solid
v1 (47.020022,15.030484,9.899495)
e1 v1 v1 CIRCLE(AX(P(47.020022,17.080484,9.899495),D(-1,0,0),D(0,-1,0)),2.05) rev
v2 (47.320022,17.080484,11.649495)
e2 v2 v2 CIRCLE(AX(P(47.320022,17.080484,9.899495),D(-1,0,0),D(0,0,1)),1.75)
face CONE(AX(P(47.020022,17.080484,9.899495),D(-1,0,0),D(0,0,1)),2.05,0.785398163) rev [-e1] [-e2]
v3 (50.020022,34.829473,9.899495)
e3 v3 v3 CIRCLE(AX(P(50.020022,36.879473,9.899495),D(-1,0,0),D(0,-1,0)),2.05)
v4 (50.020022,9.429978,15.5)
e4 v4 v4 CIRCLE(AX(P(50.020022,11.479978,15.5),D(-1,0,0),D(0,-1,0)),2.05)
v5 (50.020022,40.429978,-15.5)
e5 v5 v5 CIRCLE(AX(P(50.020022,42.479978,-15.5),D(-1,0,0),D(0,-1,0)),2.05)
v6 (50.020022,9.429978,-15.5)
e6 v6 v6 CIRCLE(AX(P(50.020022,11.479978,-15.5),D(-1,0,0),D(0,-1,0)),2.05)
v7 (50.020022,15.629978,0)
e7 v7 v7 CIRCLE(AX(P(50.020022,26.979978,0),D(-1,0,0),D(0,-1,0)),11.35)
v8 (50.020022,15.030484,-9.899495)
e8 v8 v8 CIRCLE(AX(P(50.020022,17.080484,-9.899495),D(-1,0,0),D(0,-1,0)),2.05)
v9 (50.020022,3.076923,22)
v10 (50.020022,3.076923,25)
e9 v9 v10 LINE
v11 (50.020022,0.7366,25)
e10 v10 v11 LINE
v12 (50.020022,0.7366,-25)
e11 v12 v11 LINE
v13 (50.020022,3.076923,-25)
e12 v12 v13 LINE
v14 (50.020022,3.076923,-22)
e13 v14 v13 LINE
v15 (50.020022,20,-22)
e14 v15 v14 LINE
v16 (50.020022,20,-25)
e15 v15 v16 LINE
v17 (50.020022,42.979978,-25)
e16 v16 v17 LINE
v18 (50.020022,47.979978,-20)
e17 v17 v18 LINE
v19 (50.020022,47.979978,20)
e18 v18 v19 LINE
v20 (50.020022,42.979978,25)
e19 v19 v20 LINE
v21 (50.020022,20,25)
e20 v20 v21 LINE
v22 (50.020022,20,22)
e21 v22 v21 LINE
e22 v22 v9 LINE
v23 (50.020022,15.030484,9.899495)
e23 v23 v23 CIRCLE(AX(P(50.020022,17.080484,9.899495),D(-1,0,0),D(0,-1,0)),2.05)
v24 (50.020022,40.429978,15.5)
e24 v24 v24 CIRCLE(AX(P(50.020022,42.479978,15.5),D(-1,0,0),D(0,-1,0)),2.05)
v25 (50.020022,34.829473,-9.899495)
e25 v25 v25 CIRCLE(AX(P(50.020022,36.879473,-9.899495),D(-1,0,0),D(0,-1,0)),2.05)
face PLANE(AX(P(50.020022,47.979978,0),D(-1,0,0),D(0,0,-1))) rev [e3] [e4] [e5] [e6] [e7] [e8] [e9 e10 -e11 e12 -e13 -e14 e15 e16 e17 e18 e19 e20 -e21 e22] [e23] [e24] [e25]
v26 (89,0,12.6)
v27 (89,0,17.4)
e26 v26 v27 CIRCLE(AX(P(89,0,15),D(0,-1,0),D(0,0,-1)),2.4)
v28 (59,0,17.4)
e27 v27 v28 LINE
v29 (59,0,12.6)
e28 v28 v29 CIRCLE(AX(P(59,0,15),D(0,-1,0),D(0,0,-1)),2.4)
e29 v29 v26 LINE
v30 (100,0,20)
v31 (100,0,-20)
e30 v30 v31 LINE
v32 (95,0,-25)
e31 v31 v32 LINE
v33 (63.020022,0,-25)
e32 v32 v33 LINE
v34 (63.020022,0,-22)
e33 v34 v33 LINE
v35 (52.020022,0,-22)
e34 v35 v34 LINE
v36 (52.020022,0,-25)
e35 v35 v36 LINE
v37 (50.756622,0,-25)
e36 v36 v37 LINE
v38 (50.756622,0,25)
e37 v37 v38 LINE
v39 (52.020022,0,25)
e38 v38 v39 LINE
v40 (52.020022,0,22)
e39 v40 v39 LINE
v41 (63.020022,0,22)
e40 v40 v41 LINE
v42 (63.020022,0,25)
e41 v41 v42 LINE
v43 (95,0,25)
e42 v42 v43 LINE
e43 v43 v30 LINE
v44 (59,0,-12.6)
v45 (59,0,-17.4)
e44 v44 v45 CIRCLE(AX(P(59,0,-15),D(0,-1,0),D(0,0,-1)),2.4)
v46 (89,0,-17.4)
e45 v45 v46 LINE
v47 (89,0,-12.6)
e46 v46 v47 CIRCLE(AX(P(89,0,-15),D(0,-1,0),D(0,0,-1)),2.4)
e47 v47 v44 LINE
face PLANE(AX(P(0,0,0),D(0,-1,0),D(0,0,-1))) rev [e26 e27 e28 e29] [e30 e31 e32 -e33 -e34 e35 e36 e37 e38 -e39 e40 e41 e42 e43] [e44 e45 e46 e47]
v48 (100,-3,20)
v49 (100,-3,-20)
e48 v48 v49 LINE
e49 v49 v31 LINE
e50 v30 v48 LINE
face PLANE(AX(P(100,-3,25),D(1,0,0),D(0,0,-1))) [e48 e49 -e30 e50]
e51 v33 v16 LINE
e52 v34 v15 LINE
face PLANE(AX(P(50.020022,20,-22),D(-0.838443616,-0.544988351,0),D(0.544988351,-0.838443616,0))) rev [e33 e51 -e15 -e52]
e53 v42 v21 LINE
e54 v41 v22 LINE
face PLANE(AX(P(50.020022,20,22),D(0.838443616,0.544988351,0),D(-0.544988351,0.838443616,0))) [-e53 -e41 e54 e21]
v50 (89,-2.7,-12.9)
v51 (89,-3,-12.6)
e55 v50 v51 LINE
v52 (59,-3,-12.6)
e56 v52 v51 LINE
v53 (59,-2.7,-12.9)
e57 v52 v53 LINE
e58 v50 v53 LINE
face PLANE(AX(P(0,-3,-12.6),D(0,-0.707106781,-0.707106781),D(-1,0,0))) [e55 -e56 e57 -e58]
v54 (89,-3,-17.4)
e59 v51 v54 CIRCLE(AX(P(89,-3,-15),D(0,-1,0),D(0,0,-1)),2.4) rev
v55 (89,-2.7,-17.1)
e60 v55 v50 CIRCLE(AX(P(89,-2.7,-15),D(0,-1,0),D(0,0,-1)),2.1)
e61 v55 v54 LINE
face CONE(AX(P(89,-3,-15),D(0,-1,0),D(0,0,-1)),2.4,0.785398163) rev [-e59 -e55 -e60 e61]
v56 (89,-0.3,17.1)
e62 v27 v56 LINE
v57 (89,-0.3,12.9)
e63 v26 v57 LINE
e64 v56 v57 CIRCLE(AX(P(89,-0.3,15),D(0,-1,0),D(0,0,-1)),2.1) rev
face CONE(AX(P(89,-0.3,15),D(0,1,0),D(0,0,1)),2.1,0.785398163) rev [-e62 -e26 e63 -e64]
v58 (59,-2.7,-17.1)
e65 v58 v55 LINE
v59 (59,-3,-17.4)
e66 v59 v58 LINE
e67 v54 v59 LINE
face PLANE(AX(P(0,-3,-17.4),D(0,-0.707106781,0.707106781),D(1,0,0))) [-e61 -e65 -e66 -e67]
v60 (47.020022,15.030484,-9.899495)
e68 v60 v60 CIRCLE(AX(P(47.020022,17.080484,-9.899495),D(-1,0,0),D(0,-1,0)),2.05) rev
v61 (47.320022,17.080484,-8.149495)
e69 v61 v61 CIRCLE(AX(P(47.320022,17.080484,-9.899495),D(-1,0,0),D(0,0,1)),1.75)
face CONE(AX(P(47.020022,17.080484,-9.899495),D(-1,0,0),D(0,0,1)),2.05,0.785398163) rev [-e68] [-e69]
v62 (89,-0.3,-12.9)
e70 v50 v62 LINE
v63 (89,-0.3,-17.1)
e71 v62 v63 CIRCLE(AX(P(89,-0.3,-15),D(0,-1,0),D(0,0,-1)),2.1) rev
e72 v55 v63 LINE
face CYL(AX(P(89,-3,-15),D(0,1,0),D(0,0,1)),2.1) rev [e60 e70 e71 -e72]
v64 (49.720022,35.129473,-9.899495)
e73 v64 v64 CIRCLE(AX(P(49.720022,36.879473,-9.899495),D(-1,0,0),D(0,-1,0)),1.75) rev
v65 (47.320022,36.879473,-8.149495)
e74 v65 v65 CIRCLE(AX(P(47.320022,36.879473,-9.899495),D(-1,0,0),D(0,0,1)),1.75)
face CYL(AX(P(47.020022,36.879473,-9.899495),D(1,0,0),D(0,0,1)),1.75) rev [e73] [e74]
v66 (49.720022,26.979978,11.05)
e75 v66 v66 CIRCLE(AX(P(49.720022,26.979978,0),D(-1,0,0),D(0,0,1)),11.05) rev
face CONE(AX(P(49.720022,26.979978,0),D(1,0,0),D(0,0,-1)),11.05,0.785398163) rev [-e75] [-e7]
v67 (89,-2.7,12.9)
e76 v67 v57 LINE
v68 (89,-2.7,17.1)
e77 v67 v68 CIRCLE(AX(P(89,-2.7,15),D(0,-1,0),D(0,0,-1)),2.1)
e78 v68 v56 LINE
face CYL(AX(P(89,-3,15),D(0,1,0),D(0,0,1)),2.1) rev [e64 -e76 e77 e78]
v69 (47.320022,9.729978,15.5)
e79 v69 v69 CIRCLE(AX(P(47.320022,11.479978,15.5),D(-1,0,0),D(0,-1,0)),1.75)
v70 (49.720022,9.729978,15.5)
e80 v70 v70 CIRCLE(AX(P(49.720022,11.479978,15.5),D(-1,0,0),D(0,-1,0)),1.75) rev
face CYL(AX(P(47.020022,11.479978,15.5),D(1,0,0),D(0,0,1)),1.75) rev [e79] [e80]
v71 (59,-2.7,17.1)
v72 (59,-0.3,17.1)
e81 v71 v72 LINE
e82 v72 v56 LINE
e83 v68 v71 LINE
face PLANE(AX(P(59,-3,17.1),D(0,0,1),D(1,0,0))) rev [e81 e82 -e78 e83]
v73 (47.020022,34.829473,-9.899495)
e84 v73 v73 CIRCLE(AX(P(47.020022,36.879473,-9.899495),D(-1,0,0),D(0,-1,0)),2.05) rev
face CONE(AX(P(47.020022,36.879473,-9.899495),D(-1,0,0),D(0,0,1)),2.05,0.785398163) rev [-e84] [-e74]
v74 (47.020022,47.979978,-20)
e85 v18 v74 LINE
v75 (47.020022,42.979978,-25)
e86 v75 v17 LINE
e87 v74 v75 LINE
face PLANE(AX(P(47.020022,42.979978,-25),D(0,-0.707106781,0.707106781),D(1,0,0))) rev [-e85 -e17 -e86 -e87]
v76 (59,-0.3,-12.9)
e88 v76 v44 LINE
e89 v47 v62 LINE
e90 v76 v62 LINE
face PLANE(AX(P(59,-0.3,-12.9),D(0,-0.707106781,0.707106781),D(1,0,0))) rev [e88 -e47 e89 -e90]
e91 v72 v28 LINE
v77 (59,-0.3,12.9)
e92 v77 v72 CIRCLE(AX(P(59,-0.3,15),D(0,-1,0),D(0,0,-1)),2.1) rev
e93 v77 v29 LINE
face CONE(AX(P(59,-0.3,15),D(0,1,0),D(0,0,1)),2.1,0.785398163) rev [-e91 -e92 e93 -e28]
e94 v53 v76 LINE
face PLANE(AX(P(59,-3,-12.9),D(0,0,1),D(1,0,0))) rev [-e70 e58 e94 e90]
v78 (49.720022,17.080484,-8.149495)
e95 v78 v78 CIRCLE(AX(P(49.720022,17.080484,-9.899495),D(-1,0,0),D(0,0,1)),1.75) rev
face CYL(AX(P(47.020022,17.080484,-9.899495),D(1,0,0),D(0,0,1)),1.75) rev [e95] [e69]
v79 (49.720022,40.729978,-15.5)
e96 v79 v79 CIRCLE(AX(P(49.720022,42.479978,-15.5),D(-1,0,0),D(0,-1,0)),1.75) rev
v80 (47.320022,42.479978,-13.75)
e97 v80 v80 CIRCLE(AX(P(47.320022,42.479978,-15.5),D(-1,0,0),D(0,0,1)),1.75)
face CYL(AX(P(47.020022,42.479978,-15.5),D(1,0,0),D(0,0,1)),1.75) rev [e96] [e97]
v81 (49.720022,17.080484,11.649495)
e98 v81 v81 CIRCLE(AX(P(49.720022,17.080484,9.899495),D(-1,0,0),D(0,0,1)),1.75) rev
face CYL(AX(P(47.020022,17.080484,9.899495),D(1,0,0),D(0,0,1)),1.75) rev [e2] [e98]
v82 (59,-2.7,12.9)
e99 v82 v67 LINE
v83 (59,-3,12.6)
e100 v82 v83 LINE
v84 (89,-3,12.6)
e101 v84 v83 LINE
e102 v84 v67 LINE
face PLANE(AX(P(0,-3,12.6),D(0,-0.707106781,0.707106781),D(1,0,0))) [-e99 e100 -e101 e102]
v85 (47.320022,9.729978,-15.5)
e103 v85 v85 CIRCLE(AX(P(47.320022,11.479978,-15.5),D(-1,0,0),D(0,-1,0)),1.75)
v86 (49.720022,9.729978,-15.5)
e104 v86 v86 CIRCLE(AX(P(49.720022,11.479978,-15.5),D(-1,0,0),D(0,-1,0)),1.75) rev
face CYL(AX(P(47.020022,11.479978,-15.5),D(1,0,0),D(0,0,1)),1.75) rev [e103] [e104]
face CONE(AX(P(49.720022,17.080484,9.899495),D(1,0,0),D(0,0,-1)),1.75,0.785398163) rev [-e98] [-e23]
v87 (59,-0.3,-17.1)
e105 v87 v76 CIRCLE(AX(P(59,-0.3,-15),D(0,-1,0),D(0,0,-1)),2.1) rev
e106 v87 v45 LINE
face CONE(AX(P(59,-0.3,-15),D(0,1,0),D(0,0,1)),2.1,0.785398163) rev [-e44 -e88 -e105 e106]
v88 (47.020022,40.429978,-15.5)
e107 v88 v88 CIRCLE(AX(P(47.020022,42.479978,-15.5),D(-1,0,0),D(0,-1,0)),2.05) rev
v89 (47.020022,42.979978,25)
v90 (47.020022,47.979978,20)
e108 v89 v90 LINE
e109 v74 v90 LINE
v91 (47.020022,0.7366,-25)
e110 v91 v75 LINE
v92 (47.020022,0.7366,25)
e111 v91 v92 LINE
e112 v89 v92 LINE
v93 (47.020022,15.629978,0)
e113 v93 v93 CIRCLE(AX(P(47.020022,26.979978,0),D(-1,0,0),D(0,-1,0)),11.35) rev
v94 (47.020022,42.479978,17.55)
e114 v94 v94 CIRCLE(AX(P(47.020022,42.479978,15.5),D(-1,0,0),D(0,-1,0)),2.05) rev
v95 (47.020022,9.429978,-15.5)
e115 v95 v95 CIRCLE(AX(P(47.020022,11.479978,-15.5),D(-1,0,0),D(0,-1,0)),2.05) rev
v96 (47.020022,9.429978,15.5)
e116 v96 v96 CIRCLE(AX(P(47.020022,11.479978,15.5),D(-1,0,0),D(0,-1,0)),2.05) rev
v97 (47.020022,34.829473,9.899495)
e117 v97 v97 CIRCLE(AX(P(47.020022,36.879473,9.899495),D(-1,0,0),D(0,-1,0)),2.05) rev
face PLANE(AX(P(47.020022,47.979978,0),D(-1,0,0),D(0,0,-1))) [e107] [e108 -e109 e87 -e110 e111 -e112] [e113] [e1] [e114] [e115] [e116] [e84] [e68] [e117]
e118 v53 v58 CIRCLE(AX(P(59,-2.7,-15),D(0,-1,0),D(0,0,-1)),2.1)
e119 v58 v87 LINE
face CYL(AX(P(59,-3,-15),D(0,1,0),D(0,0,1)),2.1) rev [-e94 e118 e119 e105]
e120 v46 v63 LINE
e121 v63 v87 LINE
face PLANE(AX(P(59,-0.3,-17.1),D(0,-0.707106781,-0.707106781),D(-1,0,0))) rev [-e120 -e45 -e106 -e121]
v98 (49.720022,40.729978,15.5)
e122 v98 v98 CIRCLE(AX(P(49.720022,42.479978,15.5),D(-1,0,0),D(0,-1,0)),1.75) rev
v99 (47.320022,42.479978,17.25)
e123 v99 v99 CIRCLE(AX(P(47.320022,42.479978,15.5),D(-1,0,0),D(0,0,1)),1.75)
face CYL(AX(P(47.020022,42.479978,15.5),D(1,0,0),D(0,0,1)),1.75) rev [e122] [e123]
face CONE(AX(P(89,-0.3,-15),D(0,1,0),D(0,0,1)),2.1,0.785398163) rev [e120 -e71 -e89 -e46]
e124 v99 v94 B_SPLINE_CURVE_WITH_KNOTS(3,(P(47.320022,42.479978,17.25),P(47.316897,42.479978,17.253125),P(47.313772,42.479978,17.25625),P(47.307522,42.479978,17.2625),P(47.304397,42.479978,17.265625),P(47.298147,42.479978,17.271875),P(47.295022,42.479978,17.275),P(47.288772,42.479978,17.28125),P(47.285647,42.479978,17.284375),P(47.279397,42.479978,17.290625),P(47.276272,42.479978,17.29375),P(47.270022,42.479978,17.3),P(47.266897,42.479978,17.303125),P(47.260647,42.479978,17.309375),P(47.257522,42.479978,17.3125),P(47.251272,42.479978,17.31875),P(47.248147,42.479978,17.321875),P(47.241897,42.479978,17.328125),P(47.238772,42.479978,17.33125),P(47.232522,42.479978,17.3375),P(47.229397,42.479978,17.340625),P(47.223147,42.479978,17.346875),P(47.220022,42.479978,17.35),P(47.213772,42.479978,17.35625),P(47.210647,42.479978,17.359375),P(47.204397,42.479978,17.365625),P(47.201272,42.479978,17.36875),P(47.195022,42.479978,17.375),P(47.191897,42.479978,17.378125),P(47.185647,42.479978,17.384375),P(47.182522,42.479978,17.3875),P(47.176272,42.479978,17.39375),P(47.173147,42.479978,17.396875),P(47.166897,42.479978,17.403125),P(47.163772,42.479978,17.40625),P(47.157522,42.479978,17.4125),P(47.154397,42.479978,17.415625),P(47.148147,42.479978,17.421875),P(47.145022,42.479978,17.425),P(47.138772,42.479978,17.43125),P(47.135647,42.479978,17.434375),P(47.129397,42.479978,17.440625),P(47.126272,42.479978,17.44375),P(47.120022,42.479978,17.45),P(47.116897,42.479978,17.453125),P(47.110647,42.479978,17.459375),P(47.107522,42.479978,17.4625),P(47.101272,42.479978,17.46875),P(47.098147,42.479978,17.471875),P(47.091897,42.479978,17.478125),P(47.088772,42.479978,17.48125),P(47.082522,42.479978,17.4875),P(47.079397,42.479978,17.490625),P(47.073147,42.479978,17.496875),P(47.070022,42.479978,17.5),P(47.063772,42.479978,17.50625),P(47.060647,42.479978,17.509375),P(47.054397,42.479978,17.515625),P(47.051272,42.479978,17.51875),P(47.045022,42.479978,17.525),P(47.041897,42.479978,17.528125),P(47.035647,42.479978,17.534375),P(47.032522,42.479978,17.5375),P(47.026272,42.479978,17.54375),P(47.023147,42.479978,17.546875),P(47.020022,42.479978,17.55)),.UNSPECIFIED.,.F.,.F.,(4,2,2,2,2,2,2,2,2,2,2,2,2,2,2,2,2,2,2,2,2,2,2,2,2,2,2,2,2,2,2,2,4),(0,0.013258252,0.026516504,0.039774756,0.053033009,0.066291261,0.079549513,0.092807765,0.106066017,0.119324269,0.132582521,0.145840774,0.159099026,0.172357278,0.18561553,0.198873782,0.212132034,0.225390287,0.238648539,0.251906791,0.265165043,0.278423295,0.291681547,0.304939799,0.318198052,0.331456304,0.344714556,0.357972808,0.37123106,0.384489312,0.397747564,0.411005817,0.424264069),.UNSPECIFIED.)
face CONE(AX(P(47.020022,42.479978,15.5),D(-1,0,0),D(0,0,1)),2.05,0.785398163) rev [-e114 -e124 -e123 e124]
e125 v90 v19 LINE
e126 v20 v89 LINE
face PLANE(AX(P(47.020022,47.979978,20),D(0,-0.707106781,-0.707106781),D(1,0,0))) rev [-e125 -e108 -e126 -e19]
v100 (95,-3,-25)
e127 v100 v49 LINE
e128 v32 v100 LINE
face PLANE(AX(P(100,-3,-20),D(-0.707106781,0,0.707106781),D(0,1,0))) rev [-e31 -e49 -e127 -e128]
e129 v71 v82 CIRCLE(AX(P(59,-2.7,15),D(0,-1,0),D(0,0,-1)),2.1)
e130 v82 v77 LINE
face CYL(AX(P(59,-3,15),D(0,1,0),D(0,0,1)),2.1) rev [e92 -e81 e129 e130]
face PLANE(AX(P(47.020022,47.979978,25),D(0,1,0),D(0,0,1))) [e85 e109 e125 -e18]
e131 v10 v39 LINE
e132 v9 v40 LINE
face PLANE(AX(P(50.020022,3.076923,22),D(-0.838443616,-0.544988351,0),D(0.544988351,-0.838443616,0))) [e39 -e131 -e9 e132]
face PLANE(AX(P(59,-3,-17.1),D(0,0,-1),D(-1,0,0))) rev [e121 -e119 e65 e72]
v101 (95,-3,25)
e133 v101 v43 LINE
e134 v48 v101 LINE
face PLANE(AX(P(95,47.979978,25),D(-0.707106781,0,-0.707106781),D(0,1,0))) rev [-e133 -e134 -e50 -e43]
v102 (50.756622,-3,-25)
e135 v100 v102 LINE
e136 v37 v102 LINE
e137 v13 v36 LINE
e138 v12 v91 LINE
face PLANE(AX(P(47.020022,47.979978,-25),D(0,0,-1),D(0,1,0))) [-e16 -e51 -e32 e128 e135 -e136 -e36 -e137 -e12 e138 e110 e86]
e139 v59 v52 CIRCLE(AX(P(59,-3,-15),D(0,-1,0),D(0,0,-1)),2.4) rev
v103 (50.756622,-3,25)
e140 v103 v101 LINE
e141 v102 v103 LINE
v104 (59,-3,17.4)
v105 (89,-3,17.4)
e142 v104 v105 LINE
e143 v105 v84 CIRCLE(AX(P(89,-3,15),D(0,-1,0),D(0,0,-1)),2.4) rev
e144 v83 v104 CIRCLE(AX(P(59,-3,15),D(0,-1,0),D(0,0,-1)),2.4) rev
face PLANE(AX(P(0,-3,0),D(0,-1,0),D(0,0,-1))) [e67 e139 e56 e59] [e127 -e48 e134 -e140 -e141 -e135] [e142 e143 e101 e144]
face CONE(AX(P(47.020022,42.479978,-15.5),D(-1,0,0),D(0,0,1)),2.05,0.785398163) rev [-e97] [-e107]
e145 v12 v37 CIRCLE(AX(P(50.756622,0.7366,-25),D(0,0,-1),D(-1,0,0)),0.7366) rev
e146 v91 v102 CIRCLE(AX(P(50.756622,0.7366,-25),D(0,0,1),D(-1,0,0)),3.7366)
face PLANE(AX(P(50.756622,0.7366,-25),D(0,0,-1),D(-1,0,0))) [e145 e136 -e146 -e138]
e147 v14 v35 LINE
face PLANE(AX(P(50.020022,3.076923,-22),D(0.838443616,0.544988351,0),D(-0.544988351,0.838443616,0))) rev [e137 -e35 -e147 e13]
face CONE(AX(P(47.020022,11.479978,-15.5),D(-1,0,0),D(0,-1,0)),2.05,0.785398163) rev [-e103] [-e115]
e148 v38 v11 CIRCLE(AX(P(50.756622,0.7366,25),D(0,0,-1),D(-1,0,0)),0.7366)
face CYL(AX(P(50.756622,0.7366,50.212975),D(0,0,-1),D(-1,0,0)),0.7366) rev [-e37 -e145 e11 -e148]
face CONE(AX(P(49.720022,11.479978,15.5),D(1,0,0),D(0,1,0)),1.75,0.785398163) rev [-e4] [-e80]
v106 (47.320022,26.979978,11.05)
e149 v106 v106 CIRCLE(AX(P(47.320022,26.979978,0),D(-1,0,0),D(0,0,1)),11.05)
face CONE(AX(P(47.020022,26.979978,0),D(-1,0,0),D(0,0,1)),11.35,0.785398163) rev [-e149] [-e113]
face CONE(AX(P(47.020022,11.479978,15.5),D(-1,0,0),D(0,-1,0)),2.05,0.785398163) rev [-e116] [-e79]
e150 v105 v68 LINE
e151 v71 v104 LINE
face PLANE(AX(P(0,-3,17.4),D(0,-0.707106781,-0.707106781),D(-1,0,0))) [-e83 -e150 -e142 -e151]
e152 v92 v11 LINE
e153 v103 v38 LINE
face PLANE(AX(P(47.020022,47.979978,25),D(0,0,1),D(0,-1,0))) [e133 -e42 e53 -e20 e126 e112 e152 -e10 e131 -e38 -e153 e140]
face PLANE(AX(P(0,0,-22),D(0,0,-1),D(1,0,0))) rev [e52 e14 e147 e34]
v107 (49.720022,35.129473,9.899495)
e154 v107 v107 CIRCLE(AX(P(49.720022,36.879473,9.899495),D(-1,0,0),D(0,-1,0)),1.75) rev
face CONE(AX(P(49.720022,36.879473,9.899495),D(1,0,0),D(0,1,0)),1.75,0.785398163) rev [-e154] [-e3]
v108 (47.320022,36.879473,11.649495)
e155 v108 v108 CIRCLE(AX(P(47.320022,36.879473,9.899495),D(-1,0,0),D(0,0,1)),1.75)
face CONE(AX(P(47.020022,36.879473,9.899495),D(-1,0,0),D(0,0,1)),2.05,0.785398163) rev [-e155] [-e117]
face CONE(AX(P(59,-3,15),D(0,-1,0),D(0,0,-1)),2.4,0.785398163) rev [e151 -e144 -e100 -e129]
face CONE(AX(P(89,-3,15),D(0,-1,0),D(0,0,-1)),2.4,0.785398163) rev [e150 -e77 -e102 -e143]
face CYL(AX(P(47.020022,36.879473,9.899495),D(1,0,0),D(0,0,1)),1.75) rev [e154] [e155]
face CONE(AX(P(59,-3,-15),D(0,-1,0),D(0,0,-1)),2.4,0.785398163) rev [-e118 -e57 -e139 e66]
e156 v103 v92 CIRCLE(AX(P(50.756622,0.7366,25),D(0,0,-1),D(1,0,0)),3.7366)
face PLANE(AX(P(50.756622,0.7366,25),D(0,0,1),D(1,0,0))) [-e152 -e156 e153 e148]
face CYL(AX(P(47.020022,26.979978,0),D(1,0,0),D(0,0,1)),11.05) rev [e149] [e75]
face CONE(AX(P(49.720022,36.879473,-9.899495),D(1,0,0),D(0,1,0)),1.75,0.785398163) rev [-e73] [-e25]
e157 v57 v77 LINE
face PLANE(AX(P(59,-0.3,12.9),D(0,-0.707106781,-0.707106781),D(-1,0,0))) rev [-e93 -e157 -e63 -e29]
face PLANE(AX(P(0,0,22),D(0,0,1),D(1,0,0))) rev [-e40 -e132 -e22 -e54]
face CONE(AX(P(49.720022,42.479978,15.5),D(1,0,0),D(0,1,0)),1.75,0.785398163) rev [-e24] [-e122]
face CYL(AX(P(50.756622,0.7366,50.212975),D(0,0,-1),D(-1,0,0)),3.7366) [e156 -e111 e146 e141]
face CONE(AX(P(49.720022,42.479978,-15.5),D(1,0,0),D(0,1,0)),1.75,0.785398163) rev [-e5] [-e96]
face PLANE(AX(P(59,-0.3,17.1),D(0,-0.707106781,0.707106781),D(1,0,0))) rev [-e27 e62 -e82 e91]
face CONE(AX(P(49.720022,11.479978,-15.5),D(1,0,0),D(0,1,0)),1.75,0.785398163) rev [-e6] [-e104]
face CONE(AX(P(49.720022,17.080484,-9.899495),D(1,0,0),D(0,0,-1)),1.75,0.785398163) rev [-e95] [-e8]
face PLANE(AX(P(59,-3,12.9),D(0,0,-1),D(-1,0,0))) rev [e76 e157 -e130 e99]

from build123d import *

# Parameters (mm, degrees)
SKETCH1_W                    = 100
SKETCH1_H                    = 50
BASE_FLANGE1_DEPTH           = 3
SKETCH2_R                    = 11.05
SKETCH2_R_2                  = 1.75
CUT_EXTRUDE1_DEPTH           = 104.121287812
SKETCH3_R                    = 1.75
CUT_EXTRUDE2_DEPTH           = 104.121287812
CIRPATTERN1_COUNT            = 4
CUT_EXTRUDE3_DEPTH           = 104.121287812
SKETCHED_BEND2_OUTLINE_W     = 3
SKETCHED_BEND2_OUTLINE_H     = 50
SKETCHED_BEND2_DEPTH         = 47.020021532
SKETCHED_START               = 47.383443248
SKETCHED_BEND2_2_OUTLINE_W   = 47.979978468
SKETCHED_BEND2_2_OUTLINE_H   = 50
SKETCHED_BEND2_2_OUTLINE_R   = 1.75
SKETCHED_BEND2_2_OUTLINE_R_2 = 11.05
SKETCHED_BEND2_2_DEPTH       = 2.636578284
SKETCHED_START_2             = 47.020021532
SKETCHED_BEND2_3_OUTLINE_W   = 47.979978468
SKETCHED_BEND2_3_OUTLINE_H   = 50
SKETCHED_BEND2_3_OUTLINE_R   = 1.75
SKETCHED_BEND2_3_OUTLINE_R_2 = 11.05
SKETCHED_BEND2_3_DEPTH       = 3.7366
SKETCHED_START_3             = -26
SKETCHED_BEND2_4_DEPTH       = 52
BOSS_EXTRUDE1_DEPTH          = 3
CHAMFER1_SIZE                = 5
CHAMFER2_SIZE                = 0.3
CHAMFER3_SIZE                = 0.3


with BuildPart() as part:
    # Base-Flange1: sheet metal written as solids
    # Sketch1 → Base-Flange1 (new body)
    with BuildSketch(Plane(origin=(0, 0, 0), x_dir=(1, 0, 0), z_dir=(0, 1, 0))):
        with Locations((50, 0)):
            Rectangle(SKETCH1_W, SKETCH1_H)
    extrude(amount=-BASE_FLANGE1_DEPTH)

    # Sketch2 → Cut-Extrude1 (cut, through all)
    with BuildSketch(Plane(origin=(0, 0, 0), x_dir=(1, 0, 0), z_dir=(0, 1, 0))):
        with Locations(Location((21, 0, 0), (0, 0, 270))):
            Circle(SKETCH2_R)
        with Locations(Location((5.5, 15.5, 0), (0, 0, 270))):
            Circle(SKETCH2_R_2)
        with Locations(Location((36.5, 15.5, 0), (0, 0, 270))):
            Circle(SKETCH2_R_2)
        with Locations(Location((36.5, -15.5, 0), (0, 0, 270))):
            Circle(SKETCH2_R_2)
        with Locations(Location((5.5, -15.5, 0), (0, 0, 270))):
            Circle(SKETCH2_R_2)
    extrude(amount=-CUT_EXTRUDE1_DEPTH, mode=Mode.SUBTRACT)

    # Sketch3 → Cut-Extrude2 (cut, through all)
    with BuildSketch(Plane(origin=(0, 0, 0), x_dir=(1, 0, 0), z_dir=(0, 1, 0))):
        with Locations(Location((11.100505063, 9.899494937, 0), (0, 0, 270))):
            Circle(SKETCH3_R)
    cut_extrude2 = extrude(amount=-CUT_EXTRUDE2_DEPTH, mode=Mode.SUBTRACT)

    # CirPattern1: Cut-Extrude2 ×4 about axis
    cirpattern1_axis = Axis((21, 0, 0), (0, 1, 0))
    for i in range(1, CIRPATTERN1_COUNT):
        add(cut_extrude2.rotate(cirpattern1_axis, i * 360 / CIRPATTERN1_COUNT), mode=Mode.SUBTRACT)

    # Sketch4 → Cut-Extrude3 (cut, through all)
    with BuildSketch(Plane(origin=(0, 0, 0), x_dir=(1, 0, 0), z_dir=(0, 1, 0))):
        with BuildLine():
            Line((59, 17.1), (89, 17.1))
            ThreePointArc((89, 17.1), (91.1, 15), (89, 12.9))
            Line((89, 12.9), (59, 12.9))
            ThreePointArc((59, 12.9), (56.9, 15), (59, 17.1))
        make_face()
        with BuildLine():
            Line((59, -12.9), (89, -12.9))
            ThreePointArc((89, -12.9), (91.1, -15), (89, -17.1))
            Line((89, -17.1), (59, -17.1))
            ThreePointArc((59, -17.1), (56.9, -15), (59, -12.9))
        make_face()
    extrude(amount=-CUT_EXTRUDE3_DEPTH, mode=Mode.SUBTRACT)

    # Sketched Bend2: read off the stored shape, not the designer's step
    # Sketched Bend2 outline → Sketched Bend2 (cut)
    with BuildSketch(Plane.YZ):
        with Locations((-1.5, 0)):
            Rectangle(SKETCHED_BEND2_OUTLINE_W, SKETCHED_BEND2_OUTLINE_H)
    extrude(amount=SKETCHED_BEND2_DEPTH, mode=Mode.SUBTRACT)

    # Sketched Bend2 2 outline → Sketched Bend2 2 (add)
    with BuildSketch(Plane.YZ.offset(SKETCHED_START)):
        with Locations((23.989989234, 0)):
            Rectangle(SKETCHED_BEND2_2_OUTLINE_W, SKETCHED_BEND2_2_OUTLINE_H)
        with Locations((11.479978468, -15.5)):
            Circle(SKETCHED_BEND2_2_OUTLINE_R, mode=Mode.SUBTRACT)
        with Locations((17.080483531, -9.899494937)):
            Circle(SKETCHED_BEND2_2_OUTLINE_R, mode=Mode.SUBTRACT)
        with Locations((42.479978468, -15.5)):
            Circle(SKETCHED_BEND2_2_OUTLINE_R, mode=Mode.SUBTRACT)
        with Locations((36.879473404, -9.899494937)):
            Circle(SKETCHED_BEND2_2_OUTLINE_R, mode=Mode.SUBTRACT)
        with Locations((17.080483531, 9.899494937)):
            Circle(SKETCHED_BEND2_2_OUTLINE_R, mode=Mode.SUBTRACT)
        with Locations((11.479978468, 15.5)):
            Circle(SKETCHED_BEND2_2_OUTLINE_R, mode=Mode.SUBTRACT)
        with Locations((26.979978468, 0)):
            Circle(SKETCHED_BEND2_2_OUTLINE_R_2, mode=Mode.SUBTRACT)
        with Locations((36.879473404, 9.899494937)):
            Circle(SKETCHED_BEND2_2_OUTLINE_R, mode=Mode.SUBTRACT)
        with Locations((42.479978468, 15.5)):
            Circle(SKETCHED_BEND2_2_OUTLINE_R, mode=Mode.SUBTRACT)
    extrude(amount=SKETCHED_BEND2_2_DEPTH)

    # Sketched Bend2 3 outline → Sketched Bend2 3 (add)
    with BuildSketch(Plane.YZ.offset(SKETCHED_START_2)):
        with Locations((23.989989234, 0)):
            Rectangle(SKETCHED_BEND2_3_OUTLINE_W, SKETCHED_BEND2_3_OUTLINE_H)
        with Locations((11.479978468, -15.5)):
            Circle(SKETCHED_BEND2_3_OUTLINE_R, mode=Mode.SUBTRACT)
        with Locations((17.080483531, -9.899494937)):
            Circle(SKETCHED_BEND2_3_OUTLINE_R, mode=Mode.SUBTRACT)
        with Locations((42.479978468, -15.5)):
            Circle(SKETCHED_BEND2_3_OUTLINE_R, mode=Mode.SUBTRACT)
        with Locations((36.879473404, -9.899494937)):
            Circle(SKETCHED_BEND2_3_OUTLINE_R, mode=Mode.SUBTRACT)
        with Locations((17.080483531, 9.899494937)):
            Circle(SKETCHED_BEND2_3_OUTLINE_R, mode=Mode.SUBTRACT)
        with Locations((11.479978468, 15.5)):
            Circle(SKETCHED_BEND2_3_OUTLINE_R, mode=Mode.SUBTRACT)
        with Locations((26.979978468, 0)):
            Circle(SKETCHED_BEND2_3_OUTLINE_R_2, mode=Mode.SUBTRACT)
        with Locations((36.879473404, 9.899494937)):
            Circle(SKETCHED_BEND2_3_OUTLINE_R, mode=Mode.SUBTRACT)
        with Locations((42.479978468, 15.5)):
            Circle(SKETCHED_BEND2_3_OUTLINE_R, mode=Mode.SUBTRACT)
    extrude(amount=SKETCHED_BEND2_3_DEPTH)

    # Sketched Bend2 4 outline → Sketched Bend2 4 (cut)
    with BuildSketch(Plane.XY.offset(SKETCHED_START_3)):
        with BuildLine():
            Line((50.756621532, 47.979978468), (50.020021532, 47.979978468))
            Line((50.020021532, 47.979978468), (50.020021532, 0.7366))
            ThreePointArc((50.020021532, 0.7366), (50.235766677, 0.215745145), (50.756621532, 0))
            Line((50.756621532, 0), (50.756621532, 47.979978468))
        make_face()
        with BuildLine():
            ThreePointArc((50.756621532, -3), (48.114446333, -1.905575198), (47.020021532, 0.7366))
            Line((47.020021532, 0.7366), (47.020021532, -3))
            Line((47.020021532, -3), (50.756621532, -3))
        make_face()
    extrude(amount=SKETCHED_BEND2_4_DEPTH, mode=Mode.SUBTRACT)

    # Sketch6 → Boss-Extrude1 (add)
    with BuildSketch(Plane.XY.offset(25)):
        Polygon((50.020021532, 20), (63.020021532, 0), (52.020021532, 0), (50.020021532, 3.076923077), align=None)
    boss_extrude1 = extrude(amount=-BOSS_EXTRUDE1_DEPTH)

    # Mirror1: Boss-Extrude1 across plane
    add(boss_extrude1.mirror(Plane.XY))

    # Chamfer1
    chamfer1_edges = [part.edges().sort_by_distance(p)[0] for p in [
        (100, -1.5, -25),
        (100, -1.5, 25),
        (48.520021532, 47.979978468, -25),
        (48.520021532, 47.979978468, 25),
    ]]
    chamfer(chamfer1_edges, length=CHAMFER1_SIZE)

    # Chamfer2
    chamfer2_edges = [part.edges().sort_by_distance(p)[0] for p in [
        (74, 0, -17.1),
        (91.1, 0, -15),
        (74, 0, -12.9),
        (56.9, 0, -15),
        (74, 0, 12.9),
        (91.1, 0, 15),
        (74, 0, 17.1),
        (56.9, 0, 15),
        (56.9, -3, 15),
        (74, -3, 17.1),
        (91.1, -3, 15),
        (74, -3, 12.9),
        (56.9, -3, -15),
        (74, -3, -12.9),
        (91.1, -3, -15),
        (74, -3, -17.1),
        (47.020021532, 15.929978468, 0),
        (50.020021532, 15.929978468, 0),
        (47.020021532, 40.729978468, -15.5),
        (50.020021532, 40.729978468, -15.5),
        (47.020021532, 9.729978468, -15.5),
        (50.020021532, 9.729978468, -15.5),
        (47.020021532, 9.729978468, 15.5),
        (50.020021532, 9.729978468, 15.5),
        (47.020021532, 40.729978468, 15.5),
        (50.020021532, 40.729978468, 15.5),
    ]]
    chamfer(chamfer2_edges, length=CHAMFER2_SIZE)

    # Chamfer3
    chamfer3_edges = [part.edges().sort_by_distance(p)[0] for p in [
        (47.020021532, 35.129473404, -9.899494937),
        (50.020021532, 35.129473404, -9.899494937),
        (47.020021532, 35.129473404, 9.899494937),
        (50.020021532, 35.129473404, 9.899494937),
        (47.020021532, 15.330483531, 9.899494937),
        (50.020021532, 15.330483531, 9.899494937),
        (47.020021532, 15.330483531, -9.899494937),
        (50.020021532, 15.330483531, -9.899494937),
    ]]
    chamfer(chamfer3_edges, length=CHAMFER3_SIZE)


solid = part.part
